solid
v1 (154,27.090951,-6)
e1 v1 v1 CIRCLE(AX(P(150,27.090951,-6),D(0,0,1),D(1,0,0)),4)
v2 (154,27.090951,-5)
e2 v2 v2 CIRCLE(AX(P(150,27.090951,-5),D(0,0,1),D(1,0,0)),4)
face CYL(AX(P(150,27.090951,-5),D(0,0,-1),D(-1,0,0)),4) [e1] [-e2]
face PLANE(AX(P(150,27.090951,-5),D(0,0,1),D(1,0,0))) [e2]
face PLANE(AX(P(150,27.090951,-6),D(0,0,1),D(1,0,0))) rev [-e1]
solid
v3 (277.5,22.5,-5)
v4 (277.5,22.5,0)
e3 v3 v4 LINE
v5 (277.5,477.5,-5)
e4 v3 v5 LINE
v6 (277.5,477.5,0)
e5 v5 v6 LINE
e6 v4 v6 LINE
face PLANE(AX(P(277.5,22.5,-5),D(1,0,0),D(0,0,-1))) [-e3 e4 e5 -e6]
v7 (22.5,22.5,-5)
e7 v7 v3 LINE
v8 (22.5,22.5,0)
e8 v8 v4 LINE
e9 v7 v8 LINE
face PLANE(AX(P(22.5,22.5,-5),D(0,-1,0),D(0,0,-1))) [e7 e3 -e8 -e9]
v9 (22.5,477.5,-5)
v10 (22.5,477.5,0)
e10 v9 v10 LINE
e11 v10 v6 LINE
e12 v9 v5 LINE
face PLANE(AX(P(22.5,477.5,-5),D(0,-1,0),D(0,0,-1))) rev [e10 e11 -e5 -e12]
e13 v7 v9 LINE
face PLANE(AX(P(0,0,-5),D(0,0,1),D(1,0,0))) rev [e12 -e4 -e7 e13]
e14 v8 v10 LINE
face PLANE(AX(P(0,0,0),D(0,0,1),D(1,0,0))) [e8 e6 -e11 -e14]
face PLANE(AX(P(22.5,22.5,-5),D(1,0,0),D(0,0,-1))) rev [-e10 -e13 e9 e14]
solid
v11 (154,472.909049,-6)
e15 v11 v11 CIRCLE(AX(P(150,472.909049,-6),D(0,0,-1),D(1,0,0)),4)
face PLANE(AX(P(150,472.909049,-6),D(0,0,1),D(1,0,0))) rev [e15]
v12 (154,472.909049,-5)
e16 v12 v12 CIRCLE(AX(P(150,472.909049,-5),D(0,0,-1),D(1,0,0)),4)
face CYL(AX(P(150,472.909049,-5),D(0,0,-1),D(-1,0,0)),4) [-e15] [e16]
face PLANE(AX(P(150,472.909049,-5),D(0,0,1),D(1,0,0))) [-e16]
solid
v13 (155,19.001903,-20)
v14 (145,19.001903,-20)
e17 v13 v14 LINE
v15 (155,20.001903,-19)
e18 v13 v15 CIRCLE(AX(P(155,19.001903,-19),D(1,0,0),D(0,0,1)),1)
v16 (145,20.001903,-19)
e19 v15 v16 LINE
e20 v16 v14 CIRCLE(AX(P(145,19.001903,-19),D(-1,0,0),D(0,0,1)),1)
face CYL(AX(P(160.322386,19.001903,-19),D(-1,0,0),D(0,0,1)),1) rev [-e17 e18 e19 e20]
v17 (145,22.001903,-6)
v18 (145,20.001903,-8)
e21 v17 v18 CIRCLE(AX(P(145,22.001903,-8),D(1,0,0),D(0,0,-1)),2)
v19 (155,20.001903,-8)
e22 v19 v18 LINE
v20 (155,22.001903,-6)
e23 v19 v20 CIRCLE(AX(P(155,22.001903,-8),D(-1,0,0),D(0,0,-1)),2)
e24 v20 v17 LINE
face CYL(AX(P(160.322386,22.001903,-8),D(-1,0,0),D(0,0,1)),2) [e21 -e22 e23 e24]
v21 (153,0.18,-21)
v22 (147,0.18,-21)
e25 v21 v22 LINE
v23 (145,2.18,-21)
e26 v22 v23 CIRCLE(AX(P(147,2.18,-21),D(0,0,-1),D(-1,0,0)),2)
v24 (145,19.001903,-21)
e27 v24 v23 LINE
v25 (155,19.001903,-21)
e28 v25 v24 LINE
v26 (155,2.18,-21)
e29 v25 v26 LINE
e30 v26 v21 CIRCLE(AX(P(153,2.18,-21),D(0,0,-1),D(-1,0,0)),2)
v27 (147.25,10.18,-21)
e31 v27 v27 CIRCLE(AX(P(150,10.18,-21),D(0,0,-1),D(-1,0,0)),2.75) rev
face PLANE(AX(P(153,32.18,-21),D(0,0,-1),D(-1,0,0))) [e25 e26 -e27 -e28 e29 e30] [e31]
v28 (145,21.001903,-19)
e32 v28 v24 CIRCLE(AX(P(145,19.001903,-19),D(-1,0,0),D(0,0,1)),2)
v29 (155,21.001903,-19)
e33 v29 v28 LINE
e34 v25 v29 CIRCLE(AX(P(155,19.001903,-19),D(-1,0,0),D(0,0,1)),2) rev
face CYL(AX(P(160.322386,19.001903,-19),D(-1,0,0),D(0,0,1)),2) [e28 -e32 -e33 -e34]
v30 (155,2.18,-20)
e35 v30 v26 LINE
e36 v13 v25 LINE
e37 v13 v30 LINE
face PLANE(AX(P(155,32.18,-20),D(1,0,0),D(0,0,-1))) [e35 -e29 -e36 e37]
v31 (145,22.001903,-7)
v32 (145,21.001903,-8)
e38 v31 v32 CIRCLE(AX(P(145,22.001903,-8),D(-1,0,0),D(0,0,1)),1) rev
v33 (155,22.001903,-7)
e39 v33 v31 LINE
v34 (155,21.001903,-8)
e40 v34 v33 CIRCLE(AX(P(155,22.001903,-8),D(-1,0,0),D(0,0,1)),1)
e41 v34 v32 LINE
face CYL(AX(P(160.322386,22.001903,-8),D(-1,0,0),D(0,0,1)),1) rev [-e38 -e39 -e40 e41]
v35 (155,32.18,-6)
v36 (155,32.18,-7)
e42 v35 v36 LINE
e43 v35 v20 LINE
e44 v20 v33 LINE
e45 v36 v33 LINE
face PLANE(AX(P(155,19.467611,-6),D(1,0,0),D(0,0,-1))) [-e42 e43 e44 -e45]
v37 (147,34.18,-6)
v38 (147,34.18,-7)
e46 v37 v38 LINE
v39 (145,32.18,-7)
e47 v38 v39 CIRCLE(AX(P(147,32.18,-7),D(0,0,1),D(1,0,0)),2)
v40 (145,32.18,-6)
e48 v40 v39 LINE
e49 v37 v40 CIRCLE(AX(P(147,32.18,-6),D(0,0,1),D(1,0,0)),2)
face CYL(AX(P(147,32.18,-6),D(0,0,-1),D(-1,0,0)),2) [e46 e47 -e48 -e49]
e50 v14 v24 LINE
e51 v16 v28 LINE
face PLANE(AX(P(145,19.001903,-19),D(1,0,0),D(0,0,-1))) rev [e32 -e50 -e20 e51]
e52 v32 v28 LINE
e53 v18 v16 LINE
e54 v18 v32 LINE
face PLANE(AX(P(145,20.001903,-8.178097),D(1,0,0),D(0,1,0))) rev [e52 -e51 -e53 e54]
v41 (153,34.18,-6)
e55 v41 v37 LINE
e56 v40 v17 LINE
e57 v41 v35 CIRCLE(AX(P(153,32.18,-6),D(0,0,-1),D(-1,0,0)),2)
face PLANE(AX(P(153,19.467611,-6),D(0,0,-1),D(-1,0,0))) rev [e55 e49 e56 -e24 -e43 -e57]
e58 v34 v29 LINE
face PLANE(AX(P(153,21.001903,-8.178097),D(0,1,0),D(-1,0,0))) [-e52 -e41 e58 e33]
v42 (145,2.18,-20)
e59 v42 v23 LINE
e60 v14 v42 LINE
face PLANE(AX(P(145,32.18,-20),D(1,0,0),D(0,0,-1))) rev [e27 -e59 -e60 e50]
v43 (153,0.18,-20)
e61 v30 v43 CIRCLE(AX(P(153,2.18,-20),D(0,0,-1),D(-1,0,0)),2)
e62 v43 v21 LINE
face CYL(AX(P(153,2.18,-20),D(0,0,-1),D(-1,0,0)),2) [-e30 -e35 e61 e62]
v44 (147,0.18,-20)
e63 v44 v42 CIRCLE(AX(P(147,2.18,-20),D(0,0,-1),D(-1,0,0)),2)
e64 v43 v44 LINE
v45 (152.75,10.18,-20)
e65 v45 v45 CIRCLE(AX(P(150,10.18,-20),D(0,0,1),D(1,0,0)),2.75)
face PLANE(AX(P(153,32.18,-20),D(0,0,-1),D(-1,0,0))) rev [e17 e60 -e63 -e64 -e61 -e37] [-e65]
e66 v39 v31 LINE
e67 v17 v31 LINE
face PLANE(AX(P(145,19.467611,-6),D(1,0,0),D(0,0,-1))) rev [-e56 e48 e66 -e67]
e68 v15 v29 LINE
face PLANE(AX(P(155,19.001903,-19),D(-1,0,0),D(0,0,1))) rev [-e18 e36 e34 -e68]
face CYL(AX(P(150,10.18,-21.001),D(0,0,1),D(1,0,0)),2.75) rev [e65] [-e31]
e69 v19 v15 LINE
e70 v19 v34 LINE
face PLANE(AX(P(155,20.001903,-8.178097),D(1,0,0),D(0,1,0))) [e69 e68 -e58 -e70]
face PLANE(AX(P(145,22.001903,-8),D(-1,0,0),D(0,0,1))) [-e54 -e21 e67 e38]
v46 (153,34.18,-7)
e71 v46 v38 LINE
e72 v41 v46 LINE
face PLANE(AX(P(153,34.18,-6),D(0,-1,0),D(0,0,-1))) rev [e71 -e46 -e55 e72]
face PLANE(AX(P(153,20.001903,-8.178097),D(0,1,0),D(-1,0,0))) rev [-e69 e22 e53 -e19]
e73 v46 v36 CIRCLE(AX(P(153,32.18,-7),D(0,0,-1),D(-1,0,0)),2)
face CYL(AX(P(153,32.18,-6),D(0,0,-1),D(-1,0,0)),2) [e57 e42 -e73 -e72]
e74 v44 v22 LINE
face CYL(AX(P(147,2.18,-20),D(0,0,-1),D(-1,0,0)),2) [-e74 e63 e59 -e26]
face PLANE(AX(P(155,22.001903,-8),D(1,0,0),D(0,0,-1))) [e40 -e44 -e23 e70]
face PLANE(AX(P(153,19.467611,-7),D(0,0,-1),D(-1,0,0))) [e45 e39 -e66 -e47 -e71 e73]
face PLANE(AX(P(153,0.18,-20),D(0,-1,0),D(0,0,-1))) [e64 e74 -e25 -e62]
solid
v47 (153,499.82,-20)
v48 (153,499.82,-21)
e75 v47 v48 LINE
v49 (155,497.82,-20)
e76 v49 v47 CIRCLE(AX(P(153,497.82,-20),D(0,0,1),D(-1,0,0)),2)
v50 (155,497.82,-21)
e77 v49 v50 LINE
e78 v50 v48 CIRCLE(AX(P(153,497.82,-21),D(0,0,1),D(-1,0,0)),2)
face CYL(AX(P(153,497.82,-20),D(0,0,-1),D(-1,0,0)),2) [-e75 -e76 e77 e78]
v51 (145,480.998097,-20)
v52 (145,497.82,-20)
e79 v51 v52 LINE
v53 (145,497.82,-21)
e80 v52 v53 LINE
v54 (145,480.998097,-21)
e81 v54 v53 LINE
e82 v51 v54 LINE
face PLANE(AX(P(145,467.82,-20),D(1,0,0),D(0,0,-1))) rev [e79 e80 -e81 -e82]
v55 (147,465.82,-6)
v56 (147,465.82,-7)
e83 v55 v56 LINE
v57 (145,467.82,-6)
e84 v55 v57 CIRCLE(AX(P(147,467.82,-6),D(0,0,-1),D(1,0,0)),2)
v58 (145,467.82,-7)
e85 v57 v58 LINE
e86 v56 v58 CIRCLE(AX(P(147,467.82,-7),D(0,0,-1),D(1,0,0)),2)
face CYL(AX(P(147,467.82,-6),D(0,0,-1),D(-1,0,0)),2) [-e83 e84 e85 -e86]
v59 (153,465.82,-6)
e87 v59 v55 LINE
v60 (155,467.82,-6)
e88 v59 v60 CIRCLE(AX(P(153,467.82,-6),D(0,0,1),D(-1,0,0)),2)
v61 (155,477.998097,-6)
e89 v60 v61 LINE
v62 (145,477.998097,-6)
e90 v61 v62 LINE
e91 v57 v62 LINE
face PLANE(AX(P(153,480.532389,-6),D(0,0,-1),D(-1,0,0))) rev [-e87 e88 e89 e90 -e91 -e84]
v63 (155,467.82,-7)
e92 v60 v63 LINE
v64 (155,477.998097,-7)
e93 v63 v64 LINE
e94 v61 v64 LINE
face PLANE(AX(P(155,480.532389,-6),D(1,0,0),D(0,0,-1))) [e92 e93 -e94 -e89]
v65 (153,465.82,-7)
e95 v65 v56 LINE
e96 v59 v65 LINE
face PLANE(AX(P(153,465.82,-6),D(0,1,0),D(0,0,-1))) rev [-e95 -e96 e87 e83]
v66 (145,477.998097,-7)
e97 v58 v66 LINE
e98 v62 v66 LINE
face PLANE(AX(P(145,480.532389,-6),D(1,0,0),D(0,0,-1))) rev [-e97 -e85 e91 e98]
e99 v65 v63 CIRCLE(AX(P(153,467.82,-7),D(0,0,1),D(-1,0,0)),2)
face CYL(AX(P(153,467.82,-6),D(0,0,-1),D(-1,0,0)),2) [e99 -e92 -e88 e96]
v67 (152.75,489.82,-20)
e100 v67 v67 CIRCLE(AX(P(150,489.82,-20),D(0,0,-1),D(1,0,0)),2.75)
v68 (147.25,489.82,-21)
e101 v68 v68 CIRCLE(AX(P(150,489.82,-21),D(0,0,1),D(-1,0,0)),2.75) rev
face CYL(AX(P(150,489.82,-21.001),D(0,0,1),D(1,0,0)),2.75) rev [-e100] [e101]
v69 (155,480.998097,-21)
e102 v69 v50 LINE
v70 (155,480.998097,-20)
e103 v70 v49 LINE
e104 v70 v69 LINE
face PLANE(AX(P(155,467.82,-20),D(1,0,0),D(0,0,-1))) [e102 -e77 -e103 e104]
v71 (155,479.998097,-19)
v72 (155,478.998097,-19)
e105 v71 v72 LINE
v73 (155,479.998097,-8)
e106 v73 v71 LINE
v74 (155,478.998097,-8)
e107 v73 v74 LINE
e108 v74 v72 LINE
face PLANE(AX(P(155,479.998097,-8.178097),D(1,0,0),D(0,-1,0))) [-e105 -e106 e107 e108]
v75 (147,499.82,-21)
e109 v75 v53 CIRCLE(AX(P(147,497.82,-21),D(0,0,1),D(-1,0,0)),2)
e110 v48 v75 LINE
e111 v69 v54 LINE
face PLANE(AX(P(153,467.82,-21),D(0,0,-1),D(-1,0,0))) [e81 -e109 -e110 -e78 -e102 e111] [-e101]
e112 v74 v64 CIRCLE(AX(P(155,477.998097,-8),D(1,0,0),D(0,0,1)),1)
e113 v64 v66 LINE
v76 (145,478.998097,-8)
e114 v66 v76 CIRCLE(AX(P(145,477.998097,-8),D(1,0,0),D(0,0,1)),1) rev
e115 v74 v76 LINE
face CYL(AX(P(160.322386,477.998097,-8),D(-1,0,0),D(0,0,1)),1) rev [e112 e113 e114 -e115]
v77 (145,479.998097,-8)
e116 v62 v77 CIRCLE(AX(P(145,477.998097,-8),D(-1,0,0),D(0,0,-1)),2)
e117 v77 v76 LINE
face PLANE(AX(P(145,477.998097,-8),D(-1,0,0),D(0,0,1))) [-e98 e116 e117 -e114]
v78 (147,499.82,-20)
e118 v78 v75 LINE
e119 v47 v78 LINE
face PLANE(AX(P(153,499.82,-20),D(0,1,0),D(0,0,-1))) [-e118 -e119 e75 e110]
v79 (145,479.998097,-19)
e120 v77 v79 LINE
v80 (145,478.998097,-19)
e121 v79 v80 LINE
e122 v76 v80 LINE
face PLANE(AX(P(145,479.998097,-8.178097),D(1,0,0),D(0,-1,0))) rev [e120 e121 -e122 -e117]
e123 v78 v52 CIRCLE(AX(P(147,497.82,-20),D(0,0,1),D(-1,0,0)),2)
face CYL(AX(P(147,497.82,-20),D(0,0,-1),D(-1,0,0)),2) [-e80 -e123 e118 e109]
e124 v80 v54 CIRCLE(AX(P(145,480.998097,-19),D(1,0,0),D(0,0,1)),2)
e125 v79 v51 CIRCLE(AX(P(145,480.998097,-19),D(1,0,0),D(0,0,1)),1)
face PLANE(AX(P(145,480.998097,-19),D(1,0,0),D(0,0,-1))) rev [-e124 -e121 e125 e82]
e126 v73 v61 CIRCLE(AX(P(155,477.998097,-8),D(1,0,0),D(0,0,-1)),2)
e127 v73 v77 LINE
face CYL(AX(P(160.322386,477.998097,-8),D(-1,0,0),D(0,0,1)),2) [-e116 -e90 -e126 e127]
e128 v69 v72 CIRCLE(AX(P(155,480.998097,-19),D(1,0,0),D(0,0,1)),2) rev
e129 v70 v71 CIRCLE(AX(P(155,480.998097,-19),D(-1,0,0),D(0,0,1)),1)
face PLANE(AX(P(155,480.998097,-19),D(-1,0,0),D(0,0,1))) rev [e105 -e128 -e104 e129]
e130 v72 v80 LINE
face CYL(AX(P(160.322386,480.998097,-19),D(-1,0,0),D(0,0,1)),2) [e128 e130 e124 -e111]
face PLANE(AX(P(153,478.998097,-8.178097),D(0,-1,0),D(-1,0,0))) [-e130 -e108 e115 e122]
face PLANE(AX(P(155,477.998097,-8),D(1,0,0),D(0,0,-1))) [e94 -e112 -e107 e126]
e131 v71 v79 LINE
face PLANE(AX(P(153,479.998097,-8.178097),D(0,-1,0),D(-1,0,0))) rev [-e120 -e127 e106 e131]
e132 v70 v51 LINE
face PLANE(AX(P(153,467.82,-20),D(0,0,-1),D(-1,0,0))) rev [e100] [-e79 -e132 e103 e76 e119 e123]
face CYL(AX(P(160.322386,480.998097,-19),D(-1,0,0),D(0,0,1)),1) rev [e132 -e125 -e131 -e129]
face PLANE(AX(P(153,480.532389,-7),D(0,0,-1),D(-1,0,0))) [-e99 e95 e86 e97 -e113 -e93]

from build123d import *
from build123d.topology import SkipClean

# Parameters (mm, degrees)
SKETCH1_W           = 255
SKETCH1_H           = 455
BOSS_EXTRUDE1_DEPTH = 5
BASE_FLANGE2_DEPTH  = 1
JOG1_START          = 145
JOG1_DEPTH          = 10
JOG1_START_2        = 147
JOG1_2_DEPTH        = 6
JOG1_START_3        = -8
JOG1_3_DEPTH        = 1.976704963
JOG1_START_4        = -20
JOG1_4_OUTLINE_W    = 2
JOG1_4_OUTLINE_H    = 1
JOG1_4_DEPTH        = 12.160683996
JOG1_START_5        = -7
JOG1_5_DEPTH        = 1
JOG1_6_DEPTH        = 10
JOG1_7_DEPTH        = 10
SKETCH16_R          = 2.75
CUT_EXTRUDE2_DEPTH  = 1
SKETCH17_R          = 4
BOSS_EXTRUDE2_DEPTH = 1


with BuildPart() as part:
    # Sketch1 → Boss-Extrude1 (new body)
    with BuildSketch(Plane.XY):
        with Locations((150, 250)):
            Rectangle(SKETCH1_W, SKETCH1_H)
    extrude(amount=-BOSS_EXTRUDE1_DEPTH)


with BuildPart() as body_2:
    # Base-Flange2: sheet metal written as solids
    # Sketch8 → Base-Flange2 (new body)
    with BuildSketch(Plane(origin=(0, 0, -21), x_dir=(-1, 0, 0), z_dir=(0, 0, -1))):
        with BuildLine():
            Line((-153, 34.18), (-147, 34.18))
            ThreePointArc((-147, 34.18), (-145.585786438, 33.594213562), (-145, 32.18))
            Line((-145, 32.18), (-145, 2.18))
            ThreePointArc((-145, 2.18), (-145.585786438, 0.765786438), (-147, 0.18))
            Line((-147, 0.18), (-153, 0.18))
            ThreePointArc((-153, 0.18), (-154.414213562, 0.765786438), (-155, 2.18))
            Line((-155, 2.18), (-155, 32.18))
            ThreePointArc((-155, 32.18), (-154.414213562, 33.594213562), (-153, 34.18))
        make_face()
    extrude(amount=-BASE_FLANGE2_DEPTH)

    # Jog1: read off the stored shape, not the designer's step
    # Jog1 outline → Jog1 (cut)
    with BuildSketch(Plane.YZ.offset(JOG1_START)):
        with BuildLine():
            Line((34.18, -20), (20.733953562, -20))
            ThreePointArc((20.733953562, -20), (20.001902755, -20.732050807), (19.001902755, -21))
            Line((19.001902755, -21), (34.18, -21))
            Line((34.18, -21), (34.18, -20))
        make_face()
    extrude(amount=JOG1_DEPTH, mode=Mode.SUBTRACT)

    # Jog1 2 outline → Jog1 2 (add)
    with BuildSketch(Plane.YZ.offset(JOG1_START_2)):
        with BuildLine():
            Line((20.001902755, -8), (20.001902755, -19))
            ThreePointArc((20.001902755, -19), (19.709009536, -19.707106781), (19.001902755, -20))
            Line((19.001902755, -20), (20.733953562, -20))
            ThreePointArc((20.733953562, -20), (20.933754407, -19.51763809), (21.001902755, -19))
            Line((21.001902755, -19), (21.001902755, -8))
            ThreePointArc((21.001902755, -8), (21.294795974, -7.292893219), (22.001902755, -7))
            Line((22.001902755, -7), (34.18, -7))
            Line((34.18, -7), (34.18, -6))
            Line((34.18, -6), (22.001902755, -6))
            ThreePointArc((22.001902755, -6), (20.587689193, -6.585786438), (20.001902755, -8))
        make_face()
    extrude(amount=JOG1_2_DEPTH)

    # Jog1 3 outline → Jog1 3 (add)
    with BuildSketch(Plane.XY.offset(JOG1_START_3)):
        with BuildLine():
            Line((145, 20.001902755), (147, 20.001902755))
            Line((147, 20.001902755), (147, 34.18))
            ThreePointArc((147, 34.18), (145.585786438, 33.594213562), (145, 32.18))
            Line((145, 32.18), (145, 20.001902755))
        make_face()
        with BuildLine():
            Line((153, 20.001902755), (155, 20.001902755))
            Line((155, 20.001902755), (155, 32.18))
            ThreePointArc((155, 32.18), (154.414213562, 33.594213562), (153, 34.18))
            Line((153, 34.18), (153, 20.001902755))
        make_face()
    extrude(amount=JOG1_3_DEPTH)

    # Jog1 4 outline → Jog1 4 (add)
    with BuildSketch(Plane.XY.offset(JOG1_START_4)):
        with Locations((146, 20.501902755)):
            Rectangle(JOG1_4_OUTLINE_W, JOG1_4_OUTLINE_H)
        with Locations((154, 20.501902755)):
            Rectangle(JOG1_4_OUTLINE_W, JOG1_4_OUTLINE_H)
    extrude(amount=JOG1_4_DEPTH)

    # Jog1 5 outline → Jog1 5 (add)
    with BuildSketch(Plane.XY.offset(JOG1_START_5)):
        with BuildLine():
            Line((145, 32.18), (145, 21.001902755))
            Line((145, 21.001902755), (147, 21.001902755))
            Line((147, 21.001902755), (147, 34.18))
            ThreePointArc((147, 34.18), (145.585786438, 33.594213562), (145, 32.18))
        make_face()
        with BuildLine():
            Line((153, 34.18), (153, 21.001902755))
            Line((153, 21.001902755), (155, 21.001902755))
            Line((155, 21.001902755), (155, 32.18))
            ThreePointArc((155, 32.18), (154.414213562, 33.594213562), (153, 34.18))
        make_face()
    extrude(amount=JOG1_5_DEPTH)

    # Jog1 6 outline → Jog1 6 (cut)
    with SkipClean():  # the faces are left unmerged after this step: merging them gives an invalid solid
        with BuildSketch(Plane.YZ.offset(JOG1_START)):
            with BuildLine():
                Line((20.001902755, -6.023295037), (20.001902755, -8))
                ThreePointArc((20.001902755, -8), (20.587689193, -6.585786438), (22.001902755, -6))
                Line((22.001902755, -6), (36, -5.999999991))
                Line((36, -5.999999991), (36, -5))
                Line((36, -5), (21.001902764, -5))
                Line((21.001902764, -5), (21.001902763, -6))
                Line((21.001902763, -6), (21.001902755, -6.023295037))
                Line((21.001902755, -6.023295037), (20.001902755, -6.023295037))
            make_face()
            with BuildLine():
                ThreePointArc((20.733953562, -20), (20.416116315, -20.414213564), (20.001902751, -20.732050809))
                Line((20.001902751, -20.732050809), (20.001902747, -21))
                Line((20.001902747, -21), (36, -21))
                Line((36, -21), (36, -7))
                Line((36, -7), (22.001902755, -7))
                ThreePointArc((22.001902755, -7), (21.294795974, -7.292893219), (21.001902755, -8))
                Line((21.001902755, -8), (21.001902755, -19))
                ThreePointArc((21.001902755, -19), (20.933754407, -19.51763809), (20.733953562, -20))
            make_face()
        extrude(amount=JOG1_6_DEPTH, mode=Mode.SUBTRACT)
    add(body_2.part.scale(1), mode=Mode.REPLACE)  # the faces are merged on a copy

    # Jog1 7 outline → Jog1 7 (add)
    with BuildSketch(Plane.YZ.offset(JOG1_START)):
        with BuildLine():
            Line((20.001902755, -20), (20.001902755, -19))
            ThreePointArc((20.001902755, -19), (19.709009536, -19.707106781), (19.001902755, -20))
            Line((19.001902755, -20), (18, -20.000000001))
            Line((18, -20.000000001), (18, -21))
            Line((18, -21), (19.001902755, -21))
            ThreePointArc((19.001902755, -21), (19.519540843, -20.931851653), (20.001902751, -20.732050809))
            Line((20.001902751, -20.732050809), (20.001902755, -20))
        make_face()
    extrude(amount=JOG1_7_DEPTH)

    # Sketch16 → Cut-Extrude2 (cut)
    with BuildSketch(Plane.XY.offset(-20)):
        with Locations((150, 10.18)):
            Circle(SKETCH16_R)
    extrude(amount=-CUT_EXTRUDE2_DEPTH, mode=Mode.SUBTRACT)


with BuildPart() as body_3:
    # Sketch17 → Boss-Extrude2 (new body)
    with BuildSketch(Plane.XY.offset(-6)):
        with Locations((150, 27.090951377)):
            Circle(SKETCH17_R)
    extrude(amount=BOSS_EXTRUDE2_DEPTH)


with BuildPart() as body_4:
    # Mirror1: mirrored copy
    add(body_2.part.mirror(Plane(origin=(0, 250, 0), x_dir=(0, 0, 1), z_dir=(0, -1, 0))))


with BuildPart() as body_5:
    # Mirror1 2: mirrored copy
    add(body_3.part.mirror(Plane(origin=(0, 250, 0), x_dir=(0, 0, 1), z_dir=(0, -1, 0))))


solid = Compound([part.part, body_2.part, body_3.part, body_4.part, body_5.part])
